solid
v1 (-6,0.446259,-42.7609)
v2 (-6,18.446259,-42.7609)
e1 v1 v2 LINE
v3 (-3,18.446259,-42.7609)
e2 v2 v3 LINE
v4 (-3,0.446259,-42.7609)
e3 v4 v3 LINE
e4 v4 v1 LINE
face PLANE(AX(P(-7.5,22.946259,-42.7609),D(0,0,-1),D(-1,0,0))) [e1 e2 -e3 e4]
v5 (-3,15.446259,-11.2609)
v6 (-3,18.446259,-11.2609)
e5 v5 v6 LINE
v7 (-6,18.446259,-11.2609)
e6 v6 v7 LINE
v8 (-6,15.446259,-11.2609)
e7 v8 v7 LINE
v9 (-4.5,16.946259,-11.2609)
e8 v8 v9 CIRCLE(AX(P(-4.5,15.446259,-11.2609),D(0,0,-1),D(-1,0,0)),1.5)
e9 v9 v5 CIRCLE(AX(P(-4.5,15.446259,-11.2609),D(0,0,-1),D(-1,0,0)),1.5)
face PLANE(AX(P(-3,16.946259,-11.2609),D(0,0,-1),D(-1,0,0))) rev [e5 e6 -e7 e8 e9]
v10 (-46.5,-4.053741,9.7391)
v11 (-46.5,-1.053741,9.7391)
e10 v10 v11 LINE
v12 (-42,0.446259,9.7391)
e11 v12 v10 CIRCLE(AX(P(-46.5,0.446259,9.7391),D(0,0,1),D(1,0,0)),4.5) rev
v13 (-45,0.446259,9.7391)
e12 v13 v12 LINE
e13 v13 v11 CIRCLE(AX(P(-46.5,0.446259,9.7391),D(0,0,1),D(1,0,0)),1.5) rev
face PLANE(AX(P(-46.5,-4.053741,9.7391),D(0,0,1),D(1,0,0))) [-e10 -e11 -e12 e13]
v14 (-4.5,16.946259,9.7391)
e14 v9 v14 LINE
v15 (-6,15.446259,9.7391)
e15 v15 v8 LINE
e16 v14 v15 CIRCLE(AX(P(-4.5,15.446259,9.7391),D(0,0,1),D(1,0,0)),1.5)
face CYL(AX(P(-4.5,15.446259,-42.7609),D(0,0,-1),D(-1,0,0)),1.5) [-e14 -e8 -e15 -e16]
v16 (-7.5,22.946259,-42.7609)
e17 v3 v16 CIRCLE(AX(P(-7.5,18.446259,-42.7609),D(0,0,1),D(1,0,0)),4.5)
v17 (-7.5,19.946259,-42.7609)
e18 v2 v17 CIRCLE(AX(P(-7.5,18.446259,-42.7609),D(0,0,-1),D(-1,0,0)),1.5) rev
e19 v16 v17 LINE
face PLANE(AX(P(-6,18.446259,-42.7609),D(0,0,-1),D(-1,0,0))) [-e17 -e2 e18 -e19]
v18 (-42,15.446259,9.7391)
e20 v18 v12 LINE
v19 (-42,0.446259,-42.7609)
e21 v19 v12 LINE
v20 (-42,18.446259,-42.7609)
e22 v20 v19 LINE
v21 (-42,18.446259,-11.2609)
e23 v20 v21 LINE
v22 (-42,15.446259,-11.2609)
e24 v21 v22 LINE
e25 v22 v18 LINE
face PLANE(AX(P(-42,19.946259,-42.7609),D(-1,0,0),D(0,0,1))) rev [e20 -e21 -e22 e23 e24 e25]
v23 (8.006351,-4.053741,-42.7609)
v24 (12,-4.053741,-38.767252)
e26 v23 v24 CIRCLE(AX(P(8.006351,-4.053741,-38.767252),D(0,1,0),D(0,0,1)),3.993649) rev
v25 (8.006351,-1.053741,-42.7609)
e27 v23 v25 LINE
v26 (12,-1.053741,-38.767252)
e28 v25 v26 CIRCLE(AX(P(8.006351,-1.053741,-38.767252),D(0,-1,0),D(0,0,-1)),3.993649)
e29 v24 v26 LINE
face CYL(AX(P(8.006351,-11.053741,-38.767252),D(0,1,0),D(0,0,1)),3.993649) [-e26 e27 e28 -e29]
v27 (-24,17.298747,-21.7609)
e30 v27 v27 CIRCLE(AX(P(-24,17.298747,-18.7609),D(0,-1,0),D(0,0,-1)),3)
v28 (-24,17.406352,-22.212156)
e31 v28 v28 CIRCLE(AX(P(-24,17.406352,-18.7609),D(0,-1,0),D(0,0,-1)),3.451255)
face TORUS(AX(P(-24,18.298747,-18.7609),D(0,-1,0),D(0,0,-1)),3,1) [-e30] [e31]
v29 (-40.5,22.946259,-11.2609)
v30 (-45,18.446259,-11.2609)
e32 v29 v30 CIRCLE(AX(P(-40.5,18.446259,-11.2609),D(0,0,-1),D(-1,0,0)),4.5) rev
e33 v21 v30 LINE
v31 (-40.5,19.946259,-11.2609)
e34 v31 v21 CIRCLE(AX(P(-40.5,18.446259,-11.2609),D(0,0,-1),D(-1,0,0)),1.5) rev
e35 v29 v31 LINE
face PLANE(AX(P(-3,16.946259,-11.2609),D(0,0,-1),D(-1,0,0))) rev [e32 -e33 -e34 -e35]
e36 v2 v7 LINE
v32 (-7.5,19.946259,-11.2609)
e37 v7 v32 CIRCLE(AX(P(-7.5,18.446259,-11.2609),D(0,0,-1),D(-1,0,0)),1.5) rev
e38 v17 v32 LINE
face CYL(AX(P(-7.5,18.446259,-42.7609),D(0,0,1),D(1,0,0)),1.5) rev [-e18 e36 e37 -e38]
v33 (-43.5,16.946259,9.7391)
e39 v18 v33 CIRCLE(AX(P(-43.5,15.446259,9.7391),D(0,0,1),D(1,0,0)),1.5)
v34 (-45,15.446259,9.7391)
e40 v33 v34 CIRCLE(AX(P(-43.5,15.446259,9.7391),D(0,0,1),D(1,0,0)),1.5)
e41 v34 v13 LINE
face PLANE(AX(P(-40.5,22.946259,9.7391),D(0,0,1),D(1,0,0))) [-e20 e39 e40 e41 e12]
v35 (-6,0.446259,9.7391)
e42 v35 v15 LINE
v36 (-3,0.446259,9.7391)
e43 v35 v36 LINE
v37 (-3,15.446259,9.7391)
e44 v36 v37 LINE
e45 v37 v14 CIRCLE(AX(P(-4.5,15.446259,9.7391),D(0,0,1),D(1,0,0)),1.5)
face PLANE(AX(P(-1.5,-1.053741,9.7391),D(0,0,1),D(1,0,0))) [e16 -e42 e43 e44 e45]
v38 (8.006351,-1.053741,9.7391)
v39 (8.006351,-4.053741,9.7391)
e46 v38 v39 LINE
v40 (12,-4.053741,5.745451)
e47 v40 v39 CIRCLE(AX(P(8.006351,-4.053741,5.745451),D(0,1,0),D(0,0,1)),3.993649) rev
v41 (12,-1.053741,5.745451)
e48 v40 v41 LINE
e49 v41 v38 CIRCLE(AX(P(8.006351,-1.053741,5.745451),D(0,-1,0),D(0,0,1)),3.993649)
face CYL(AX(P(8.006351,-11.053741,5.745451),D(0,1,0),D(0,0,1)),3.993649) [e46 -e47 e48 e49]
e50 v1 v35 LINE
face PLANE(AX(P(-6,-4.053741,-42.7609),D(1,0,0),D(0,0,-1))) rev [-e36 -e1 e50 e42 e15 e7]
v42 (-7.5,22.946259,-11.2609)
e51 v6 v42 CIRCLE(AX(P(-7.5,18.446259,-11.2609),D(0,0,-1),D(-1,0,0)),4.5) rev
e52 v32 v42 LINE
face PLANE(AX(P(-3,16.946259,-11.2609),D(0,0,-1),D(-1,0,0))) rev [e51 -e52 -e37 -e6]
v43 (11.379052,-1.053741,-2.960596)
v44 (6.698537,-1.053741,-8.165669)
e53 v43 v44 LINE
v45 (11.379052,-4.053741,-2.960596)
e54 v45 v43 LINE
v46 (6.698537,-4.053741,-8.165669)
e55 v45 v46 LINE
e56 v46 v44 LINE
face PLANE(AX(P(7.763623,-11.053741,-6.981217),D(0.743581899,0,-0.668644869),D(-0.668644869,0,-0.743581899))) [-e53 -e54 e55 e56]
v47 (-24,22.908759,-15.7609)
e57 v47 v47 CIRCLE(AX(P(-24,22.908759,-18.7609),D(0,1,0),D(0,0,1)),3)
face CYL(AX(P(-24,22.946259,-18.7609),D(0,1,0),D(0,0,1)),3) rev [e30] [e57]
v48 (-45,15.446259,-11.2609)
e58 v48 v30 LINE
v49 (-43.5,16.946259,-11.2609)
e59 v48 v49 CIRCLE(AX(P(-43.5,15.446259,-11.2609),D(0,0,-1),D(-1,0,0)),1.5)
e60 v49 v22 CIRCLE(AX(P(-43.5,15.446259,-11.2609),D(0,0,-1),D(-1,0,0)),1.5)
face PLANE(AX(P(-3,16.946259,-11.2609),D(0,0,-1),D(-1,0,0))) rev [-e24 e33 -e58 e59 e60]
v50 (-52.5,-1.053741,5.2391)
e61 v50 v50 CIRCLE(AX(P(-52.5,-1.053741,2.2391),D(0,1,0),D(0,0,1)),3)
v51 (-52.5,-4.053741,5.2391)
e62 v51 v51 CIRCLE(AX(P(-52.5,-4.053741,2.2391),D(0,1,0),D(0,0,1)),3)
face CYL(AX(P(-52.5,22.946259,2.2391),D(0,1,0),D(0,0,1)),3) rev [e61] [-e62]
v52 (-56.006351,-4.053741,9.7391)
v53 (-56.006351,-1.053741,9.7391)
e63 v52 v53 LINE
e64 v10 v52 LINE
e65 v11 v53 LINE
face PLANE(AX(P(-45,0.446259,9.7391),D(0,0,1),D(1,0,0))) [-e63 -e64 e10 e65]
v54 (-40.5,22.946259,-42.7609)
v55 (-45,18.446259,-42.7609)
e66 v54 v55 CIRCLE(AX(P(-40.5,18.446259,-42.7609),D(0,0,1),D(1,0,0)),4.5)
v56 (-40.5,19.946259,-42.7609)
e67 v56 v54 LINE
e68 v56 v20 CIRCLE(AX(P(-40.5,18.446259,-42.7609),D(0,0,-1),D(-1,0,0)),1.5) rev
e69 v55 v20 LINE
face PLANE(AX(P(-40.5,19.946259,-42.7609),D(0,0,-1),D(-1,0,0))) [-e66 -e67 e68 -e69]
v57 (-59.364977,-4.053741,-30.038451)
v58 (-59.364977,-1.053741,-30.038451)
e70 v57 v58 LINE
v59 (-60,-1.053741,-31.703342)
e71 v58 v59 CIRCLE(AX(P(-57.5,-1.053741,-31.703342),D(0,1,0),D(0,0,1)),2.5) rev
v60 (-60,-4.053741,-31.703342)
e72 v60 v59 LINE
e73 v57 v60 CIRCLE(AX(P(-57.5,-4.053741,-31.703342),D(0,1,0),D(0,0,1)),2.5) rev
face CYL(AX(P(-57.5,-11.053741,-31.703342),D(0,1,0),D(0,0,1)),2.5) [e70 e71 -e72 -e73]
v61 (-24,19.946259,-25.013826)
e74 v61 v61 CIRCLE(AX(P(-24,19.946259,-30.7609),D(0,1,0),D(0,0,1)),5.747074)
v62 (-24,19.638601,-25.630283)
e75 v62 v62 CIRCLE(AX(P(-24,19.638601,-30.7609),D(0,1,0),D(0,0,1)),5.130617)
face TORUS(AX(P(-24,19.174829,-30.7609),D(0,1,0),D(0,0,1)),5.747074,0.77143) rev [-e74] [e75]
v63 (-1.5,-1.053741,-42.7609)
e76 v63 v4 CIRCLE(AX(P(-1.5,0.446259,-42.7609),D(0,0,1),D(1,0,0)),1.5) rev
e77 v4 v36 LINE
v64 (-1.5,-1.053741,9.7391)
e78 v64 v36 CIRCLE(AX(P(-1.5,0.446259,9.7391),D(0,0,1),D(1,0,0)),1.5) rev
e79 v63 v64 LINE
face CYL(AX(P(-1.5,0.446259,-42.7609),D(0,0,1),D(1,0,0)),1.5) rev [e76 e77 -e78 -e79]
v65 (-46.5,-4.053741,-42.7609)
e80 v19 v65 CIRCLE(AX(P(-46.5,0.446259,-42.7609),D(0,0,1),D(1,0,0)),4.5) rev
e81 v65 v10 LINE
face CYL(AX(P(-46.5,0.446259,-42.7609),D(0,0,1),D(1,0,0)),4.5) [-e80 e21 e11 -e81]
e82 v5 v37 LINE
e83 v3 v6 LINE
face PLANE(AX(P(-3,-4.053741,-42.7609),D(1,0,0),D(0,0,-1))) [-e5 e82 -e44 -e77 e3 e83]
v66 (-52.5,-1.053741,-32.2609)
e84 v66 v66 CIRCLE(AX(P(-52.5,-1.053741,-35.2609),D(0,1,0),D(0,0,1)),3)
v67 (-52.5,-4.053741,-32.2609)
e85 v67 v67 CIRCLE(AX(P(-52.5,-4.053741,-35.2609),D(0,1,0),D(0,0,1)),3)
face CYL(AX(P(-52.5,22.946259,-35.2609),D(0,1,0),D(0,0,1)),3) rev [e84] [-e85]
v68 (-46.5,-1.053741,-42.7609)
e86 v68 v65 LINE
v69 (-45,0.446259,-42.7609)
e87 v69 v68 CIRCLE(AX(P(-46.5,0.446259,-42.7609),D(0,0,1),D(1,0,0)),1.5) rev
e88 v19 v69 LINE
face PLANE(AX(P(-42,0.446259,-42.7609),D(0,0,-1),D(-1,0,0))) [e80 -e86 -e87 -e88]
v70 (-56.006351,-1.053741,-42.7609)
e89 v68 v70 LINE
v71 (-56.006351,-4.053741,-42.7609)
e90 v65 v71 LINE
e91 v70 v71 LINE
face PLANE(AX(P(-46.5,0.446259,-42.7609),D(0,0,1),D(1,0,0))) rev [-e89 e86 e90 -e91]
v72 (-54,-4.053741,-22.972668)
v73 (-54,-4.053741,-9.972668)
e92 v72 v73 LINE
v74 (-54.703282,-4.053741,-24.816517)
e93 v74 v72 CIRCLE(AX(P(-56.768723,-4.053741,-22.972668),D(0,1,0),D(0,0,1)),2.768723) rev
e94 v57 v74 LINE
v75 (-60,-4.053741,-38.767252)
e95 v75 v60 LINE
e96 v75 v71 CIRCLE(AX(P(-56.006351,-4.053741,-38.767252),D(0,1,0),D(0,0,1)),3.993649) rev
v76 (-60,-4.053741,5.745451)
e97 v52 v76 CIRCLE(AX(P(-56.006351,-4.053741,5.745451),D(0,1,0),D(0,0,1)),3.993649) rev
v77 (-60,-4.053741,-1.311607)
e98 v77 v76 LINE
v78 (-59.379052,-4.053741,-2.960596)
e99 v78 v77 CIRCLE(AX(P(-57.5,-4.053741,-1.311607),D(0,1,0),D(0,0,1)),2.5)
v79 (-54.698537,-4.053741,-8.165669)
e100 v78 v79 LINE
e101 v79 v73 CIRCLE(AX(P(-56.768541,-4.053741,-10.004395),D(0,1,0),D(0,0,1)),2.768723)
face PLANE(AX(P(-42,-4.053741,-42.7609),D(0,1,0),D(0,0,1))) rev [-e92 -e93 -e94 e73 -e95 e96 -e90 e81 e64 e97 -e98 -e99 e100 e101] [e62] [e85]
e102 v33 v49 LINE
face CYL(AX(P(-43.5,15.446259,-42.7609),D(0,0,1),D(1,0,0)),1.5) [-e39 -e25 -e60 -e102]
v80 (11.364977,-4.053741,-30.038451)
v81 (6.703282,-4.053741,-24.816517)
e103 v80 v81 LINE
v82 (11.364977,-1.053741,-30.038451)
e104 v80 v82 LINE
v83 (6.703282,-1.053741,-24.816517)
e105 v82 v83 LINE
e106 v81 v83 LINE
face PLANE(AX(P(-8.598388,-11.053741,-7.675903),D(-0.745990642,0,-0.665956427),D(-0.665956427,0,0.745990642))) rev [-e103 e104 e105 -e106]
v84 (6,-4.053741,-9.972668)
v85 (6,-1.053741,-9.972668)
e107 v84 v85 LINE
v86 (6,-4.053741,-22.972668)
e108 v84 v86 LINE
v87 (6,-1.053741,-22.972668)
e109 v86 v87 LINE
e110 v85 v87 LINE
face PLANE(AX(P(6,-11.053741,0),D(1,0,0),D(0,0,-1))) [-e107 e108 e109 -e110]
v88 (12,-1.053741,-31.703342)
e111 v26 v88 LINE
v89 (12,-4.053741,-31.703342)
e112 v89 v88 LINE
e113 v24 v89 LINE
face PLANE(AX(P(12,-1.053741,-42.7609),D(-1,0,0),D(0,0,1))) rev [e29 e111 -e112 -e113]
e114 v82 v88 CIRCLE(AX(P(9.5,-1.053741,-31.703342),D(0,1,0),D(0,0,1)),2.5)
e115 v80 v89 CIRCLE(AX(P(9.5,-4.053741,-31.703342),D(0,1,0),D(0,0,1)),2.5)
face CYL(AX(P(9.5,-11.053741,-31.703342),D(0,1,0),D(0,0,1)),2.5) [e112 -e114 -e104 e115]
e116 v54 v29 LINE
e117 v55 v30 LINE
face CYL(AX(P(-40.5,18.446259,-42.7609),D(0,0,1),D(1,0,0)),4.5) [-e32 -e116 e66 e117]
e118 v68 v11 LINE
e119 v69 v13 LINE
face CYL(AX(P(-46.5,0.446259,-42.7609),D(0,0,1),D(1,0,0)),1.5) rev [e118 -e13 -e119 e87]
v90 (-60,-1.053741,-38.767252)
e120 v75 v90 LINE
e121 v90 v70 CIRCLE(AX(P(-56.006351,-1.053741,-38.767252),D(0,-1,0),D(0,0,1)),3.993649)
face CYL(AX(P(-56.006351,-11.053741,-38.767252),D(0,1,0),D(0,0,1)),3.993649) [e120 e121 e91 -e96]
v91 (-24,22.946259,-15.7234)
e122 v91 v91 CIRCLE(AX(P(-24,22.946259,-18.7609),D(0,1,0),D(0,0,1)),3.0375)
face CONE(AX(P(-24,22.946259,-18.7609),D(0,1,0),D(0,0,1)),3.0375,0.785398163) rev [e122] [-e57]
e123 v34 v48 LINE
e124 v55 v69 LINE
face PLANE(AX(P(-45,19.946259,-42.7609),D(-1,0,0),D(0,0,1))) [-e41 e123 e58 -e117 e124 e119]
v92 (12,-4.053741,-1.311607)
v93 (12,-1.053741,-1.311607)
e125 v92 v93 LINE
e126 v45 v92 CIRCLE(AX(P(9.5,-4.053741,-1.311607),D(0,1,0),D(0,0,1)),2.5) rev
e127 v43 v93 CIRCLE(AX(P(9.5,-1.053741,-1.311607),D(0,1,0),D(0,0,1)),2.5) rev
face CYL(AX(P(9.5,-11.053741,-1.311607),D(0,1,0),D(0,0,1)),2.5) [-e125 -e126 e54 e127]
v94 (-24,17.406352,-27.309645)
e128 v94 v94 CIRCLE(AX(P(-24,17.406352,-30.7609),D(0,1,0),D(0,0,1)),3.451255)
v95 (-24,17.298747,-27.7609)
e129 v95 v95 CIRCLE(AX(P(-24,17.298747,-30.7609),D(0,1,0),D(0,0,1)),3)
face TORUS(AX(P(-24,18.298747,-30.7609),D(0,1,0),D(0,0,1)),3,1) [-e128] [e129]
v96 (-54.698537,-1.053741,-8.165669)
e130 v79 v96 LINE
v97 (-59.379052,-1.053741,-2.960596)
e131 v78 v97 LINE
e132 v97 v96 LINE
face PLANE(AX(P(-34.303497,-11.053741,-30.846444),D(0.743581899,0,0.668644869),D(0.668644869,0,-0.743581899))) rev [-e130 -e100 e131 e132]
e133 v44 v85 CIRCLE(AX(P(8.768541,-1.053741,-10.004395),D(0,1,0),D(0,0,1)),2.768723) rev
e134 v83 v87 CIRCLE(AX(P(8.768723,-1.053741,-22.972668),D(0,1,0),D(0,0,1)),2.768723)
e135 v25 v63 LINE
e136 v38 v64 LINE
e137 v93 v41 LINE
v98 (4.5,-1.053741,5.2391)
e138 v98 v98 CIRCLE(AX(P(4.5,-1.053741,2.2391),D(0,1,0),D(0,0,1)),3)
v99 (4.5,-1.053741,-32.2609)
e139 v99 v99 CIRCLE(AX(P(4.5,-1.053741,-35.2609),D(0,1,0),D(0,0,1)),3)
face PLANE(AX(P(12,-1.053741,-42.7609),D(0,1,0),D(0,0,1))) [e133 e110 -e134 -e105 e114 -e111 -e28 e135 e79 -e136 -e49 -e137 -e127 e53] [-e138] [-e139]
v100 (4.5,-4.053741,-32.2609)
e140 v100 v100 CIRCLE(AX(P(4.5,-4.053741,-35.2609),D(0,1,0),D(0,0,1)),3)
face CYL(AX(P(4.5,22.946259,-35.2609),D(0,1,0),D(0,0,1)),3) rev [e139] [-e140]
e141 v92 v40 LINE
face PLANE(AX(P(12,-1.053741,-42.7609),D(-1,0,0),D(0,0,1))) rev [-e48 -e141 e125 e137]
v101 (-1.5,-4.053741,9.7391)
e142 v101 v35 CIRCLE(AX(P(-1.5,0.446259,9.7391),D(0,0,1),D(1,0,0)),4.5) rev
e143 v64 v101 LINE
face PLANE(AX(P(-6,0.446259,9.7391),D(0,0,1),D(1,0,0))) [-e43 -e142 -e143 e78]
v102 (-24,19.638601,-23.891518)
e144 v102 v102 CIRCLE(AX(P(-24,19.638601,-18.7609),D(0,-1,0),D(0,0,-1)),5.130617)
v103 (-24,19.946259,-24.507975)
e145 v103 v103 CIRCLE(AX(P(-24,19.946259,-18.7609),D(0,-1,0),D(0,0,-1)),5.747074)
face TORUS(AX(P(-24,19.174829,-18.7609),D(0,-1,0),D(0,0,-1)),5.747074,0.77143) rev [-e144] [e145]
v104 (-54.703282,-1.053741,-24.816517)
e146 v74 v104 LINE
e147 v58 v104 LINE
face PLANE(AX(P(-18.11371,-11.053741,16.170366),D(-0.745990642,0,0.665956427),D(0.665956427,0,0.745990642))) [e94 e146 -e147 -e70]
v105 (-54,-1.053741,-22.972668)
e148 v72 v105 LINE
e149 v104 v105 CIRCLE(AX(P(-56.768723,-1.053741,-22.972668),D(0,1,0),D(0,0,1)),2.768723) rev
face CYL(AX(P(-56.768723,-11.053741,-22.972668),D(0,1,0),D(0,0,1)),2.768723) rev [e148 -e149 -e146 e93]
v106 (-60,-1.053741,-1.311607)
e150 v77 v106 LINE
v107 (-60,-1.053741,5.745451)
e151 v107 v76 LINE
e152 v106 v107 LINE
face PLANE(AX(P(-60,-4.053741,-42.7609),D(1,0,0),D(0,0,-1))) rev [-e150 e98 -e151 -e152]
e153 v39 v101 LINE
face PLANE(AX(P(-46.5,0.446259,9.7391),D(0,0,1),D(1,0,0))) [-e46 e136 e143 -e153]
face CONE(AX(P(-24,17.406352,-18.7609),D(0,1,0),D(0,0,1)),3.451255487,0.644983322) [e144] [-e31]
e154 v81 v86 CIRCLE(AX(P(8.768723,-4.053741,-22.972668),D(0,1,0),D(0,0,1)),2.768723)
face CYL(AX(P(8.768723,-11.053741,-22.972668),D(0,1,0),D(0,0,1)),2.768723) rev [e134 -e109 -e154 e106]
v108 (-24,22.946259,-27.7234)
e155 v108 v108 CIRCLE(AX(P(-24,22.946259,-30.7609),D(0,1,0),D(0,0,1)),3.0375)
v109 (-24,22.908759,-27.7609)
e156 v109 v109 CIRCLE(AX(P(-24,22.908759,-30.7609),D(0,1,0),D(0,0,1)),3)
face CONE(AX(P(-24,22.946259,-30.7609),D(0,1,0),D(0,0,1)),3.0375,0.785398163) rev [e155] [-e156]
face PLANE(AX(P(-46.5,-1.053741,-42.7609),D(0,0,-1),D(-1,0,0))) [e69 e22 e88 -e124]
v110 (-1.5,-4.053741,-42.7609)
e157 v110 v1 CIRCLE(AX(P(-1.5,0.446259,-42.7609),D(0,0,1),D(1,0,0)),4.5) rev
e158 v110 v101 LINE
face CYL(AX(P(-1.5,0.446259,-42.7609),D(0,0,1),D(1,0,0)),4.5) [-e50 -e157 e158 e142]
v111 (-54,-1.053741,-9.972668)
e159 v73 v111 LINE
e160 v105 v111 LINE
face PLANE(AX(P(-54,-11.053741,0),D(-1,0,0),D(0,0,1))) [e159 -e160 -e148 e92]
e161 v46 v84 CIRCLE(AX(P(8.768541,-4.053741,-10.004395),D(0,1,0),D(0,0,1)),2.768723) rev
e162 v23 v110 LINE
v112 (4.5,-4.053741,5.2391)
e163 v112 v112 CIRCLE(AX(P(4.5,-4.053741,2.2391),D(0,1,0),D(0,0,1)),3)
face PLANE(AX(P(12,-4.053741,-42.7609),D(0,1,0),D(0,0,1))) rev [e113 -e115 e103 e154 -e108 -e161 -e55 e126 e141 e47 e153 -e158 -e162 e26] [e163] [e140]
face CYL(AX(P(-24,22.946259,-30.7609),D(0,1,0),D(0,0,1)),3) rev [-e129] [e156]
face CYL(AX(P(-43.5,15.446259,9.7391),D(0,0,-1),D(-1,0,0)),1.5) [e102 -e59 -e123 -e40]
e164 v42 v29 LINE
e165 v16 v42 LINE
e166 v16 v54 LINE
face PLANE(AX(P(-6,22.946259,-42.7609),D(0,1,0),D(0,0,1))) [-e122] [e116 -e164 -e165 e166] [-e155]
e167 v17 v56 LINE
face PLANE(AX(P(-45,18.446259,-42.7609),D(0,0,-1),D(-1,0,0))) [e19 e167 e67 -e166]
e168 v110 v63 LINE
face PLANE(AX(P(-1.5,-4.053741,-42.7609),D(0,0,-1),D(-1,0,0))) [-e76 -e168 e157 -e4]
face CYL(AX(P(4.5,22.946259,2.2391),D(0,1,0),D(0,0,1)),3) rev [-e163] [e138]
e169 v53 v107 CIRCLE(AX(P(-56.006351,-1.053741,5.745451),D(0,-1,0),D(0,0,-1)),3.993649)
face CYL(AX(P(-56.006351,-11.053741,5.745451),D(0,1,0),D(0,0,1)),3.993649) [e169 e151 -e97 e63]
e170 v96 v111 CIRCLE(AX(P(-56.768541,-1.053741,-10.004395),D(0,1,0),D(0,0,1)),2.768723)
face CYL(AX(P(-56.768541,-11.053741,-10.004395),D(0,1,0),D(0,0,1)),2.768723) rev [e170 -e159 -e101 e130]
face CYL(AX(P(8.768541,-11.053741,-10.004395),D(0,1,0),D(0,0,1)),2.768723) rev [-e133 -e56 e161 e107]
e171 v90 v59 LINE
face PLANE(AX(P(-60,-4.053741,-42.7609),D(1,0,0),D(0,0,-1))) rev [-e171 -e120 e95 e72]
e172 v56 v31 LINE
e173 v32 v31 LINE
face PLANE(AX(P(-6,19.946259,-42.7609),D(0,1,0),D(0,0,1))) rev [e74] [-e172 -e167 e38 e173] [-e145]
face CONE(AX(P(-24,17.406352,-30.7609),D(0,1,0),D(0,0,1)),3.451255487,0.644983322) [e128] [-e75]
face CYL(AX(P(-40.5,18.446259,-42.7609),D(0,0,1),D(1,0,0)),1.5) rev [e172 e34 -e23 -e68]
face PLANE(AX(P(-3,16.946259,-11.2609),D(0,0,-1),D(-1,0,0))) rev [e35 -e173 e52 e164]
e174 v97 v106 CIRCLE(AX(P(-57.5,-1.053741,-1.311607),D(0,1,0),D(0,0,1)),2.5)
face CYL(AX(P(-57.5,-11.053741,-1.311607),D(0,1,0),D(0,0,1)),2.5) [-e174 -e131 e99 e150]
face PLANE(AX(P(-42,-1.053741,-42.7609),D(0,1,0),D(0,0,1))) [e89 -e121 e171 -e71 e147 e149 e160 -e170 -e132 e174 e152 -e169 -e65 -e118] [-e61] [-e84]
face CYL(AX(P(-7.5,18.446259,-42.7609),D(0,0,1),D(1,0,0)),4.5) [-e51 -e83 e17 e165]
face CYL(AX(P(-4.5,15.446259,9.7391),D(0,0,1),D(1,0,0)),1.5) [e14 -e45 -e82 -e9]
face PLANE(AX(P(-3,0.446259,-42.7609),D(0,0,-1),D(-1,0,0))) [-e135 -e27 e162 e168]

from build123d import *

# Parameters (mm, degrees)
BASE_FLANGE1_DEPTH                 = 35
SKETCH10_W                         = 28
SKETCH10_H                         = 14
CUT_EXTRUDE1_DEPTH                 = 4
F_4_0_4_DIAMETER_HOLE1_D           = 4
F_4_0_4_DIAMETER_HOLE1_CSINK_D     = 4.05
F_4_0_4_DIAMETER_HOLE1_CSINK_ANGLE = 90
SCALE1_SCALE                       = 1.5
CUT_EXTRUDE2_DEPTH                 = 10
CUT_EXTRUDE3_DEPTH                 = 10
FILLET1_R                          = 1.5


# Sheet-metal steps are written as plain solids
with BuildPart() as part:
    # Sketch1 → Base-Flange1 (new body)
    with BuildSketch(Plane.XY):
        with BuildLine():
            Line((0, 0), (-9, 0))
            ThreePointArc((-9, 0), (-11.121320344, 0.878679656), (-12, 3))
            Line((-12, 3), (-12, 15))
            ThreePointArc((-12, 15), (-12.292893219, 15.707106781), (-13, 16))
            Line((-13, 16), (-35, 16))
            ThreePointArc((-35, 16), (-35.707106781, 15.707106781), (-36, 15))
            Line((-36, 15), (-36, 3))
            ThreePointArc((-36, 3), (-36.878679656, 0.878679656), (-39, 0))
            Line((-39, 0), (-48, 0))
            Line((-48, 0), (-48, 2))
            Line((-48, 2), (-39, 2))
            ThreePointArc((-39, 2), (-38.292893219, 2.292893219), (-38, 3))
            Line((-38, 3), (-38, 15))
            ThreePointArc((-38, 15), (-37.121320344, 17.121320344), (-35, 18))
            Line((-35, 18), (-13, 18))
            ThreePointArc((-13, 18), (-10.878679656, 17.121320344), (-10, 15))
            Line((-10, 15), (-10, 3))
            ThreePointArc((-10, 3), (-9.707106781, 2.292893219), (-9, 2))
            Line((-9, 2), (0, 2))
            Line((0, 2), (0, 0))
        make_face()
    extrude(amount=-BASE_FLANGE1_DEPTH)

    # Sketch10 → Cut-Extrude1 (cut)
    with BuildSketch(Plane(origin=(0, 18, 0), x_dir=(1, 0, 0), z_dir=(0, 1, 0))):
        with Locations((-24, 7)):
            Rectangle(SKETCH10_W, SKETCH10_H)
    extrude(amount=-CUT_EXTRUDE1_DEPTH, mode=Mode.SUBTRACT)

    # Ø4.0 (4) Diameter Hole1 (through all)
    with Locations(Plane(origin=(0, 18, 0), x_dir=(1, 0, 0), z_dir=(0, 1, 0))):
        with Locations((-24, 27), (-24, 19), (-43, 30), (-43, 5), (-5, 30), (-5, 5)):
            CounterSinkHole(F_4_0_4_DIAMETER_HOLE1_D / 2, F_4_0_4_DIAMETER_HOLE1_CSINK_D / 2, counter_sink_angle=F_4_0_4_DIAMETER_HOLE1_CSINK_ANGLE)


with BuildPart() as part_1:
    # Scale1: scaled about (-24, 8.107482912, -19.478199083)
    add(part.part.scale(SCALE1_SCALE).moved(Location((12, -4.053741456, 9.739099541))))

    # Sketch15 → Cut-Extrude2 (cut)
    with BuildSketch(Plane(origin=(0, -1.053741456, 0), x_dir=(1, 0, 0), z_dir=(0, 1, 0))):
        with BuildLine():
            Line((-60, 38.767251784), (-60, 42.760900459))
            Line((-60, 42.760900459), (-56.006351326, 42.760900459))
            ThreePointArc((-56.006351326, 42.760900459), (-58.830287385, 41.591187844), (-60, 38.767251784))
        make_face()
        with BuildLine():
            Line((-60, -9.739099541), (-56.006351326, -9.739099541))
            ThreePointArc((-56.006351326, -9.739099541), (-58.830287385, -8.569386926), (-60, -5.745450867))
            Line((-60, -5.745450867), (-60, -9.739099541))
        make_face()
        with BuildLine():
            Line((12, -5.745450867), (12, -9.739099541))
            Line((12, -9.739099541), (8.006351326, -9.739099541))
            ThreePointArc((8.006351326, -9.739099541), (10.830287385, -8.569386926), (12, -5.745450867))
        make_face()
        with BuildLine():
            Line((12, 42.760900459), (8.006351326, 42.760900459))
            ThreePointArc((8.006351326, 42.760900459), (10.830287385, 41.591187844), (12, 38.767251784))
            Line((12, 38.767251784), (12, 42.760900459))
        make_face()
    extrude(amount=-CUT_EXTRUDE2_DEPTH, mode=Mode.SUBTRACT)

    # Sketch16 → Cut-Extrude3 (cut)
    with BuildSketch(Plane(origin=(0, -1.053741456, 0), x_dir=(1, 0, 0), z_dir=(0, 1, 0))):
        with BuildLine():
            Line((-54.703281617, 24.816516721), (-59.364976604, 30.038451214))
            ThreePointArc((-59.364976604, 30.038451214), (-59.835855465, 30.812399385), (-60, 31.703342281))
            Line((-60, 31.703342281), (-60, 1.311607043))
            ThreePointArc((-60, 1.311607043), (-59.839618442, 2.192620974), (-59.379051563, 2.960596195))
            Line((-59.379051563, 2.960596195), (-54.698537483, 8.165669485))
            ThreePointArc((-54.698537483, 8.165669485), (-54.186063754, 9.006077869), (-54, 9.972667676))
            Line((-54, 9.972667676), (-54, 22.972667676))
            ThreePointArc((-54, 22.972667676), (-54.181788316, 23.959377402), (-54.703281617, 24.816516721))
        make_face()
        with BuildLine():
            Line((11.364976604, 30.038451214), (6.703281617, 24.816516721))
            ThreePointArc((6.703281617, 24.816516721), (6.181788316, 23.959377402), (6, 22.972667676))
            Line((6, 22.972667676), (6, 9.972667676))
            ThreePointArc((6, 9.972667676), (6.186063754, 9.006077869), (6.698537483, 8.165669485))
            Line((6.698537483, 8.165669485), (11.379051563, 2.960596195))
            ThreePointArc((11.379051563, 2.960596195), (11.839618442, 2.192620974), (12, 1.311607043))
            Line((12, 1.311607043), (12, 31.703342281))
            ThreePointArc((12, 31.703342281), (11.835855465, 30.812399385), (11.364976604, 30.038451214))
        make_face()
    extrude(amount=-CUT_EXTRUDE3_DEPTH, mode=Mode.SUBTRACT)

    # Fillet1
    fillet1_edges = [part_1.edges().sort_by_distance(p)[0] for p in [
        (-3, 16.946258544, -0.760900459),
        (-45, 16.946258544, -0.760900458),
        (-6, 16.946258544, -0.760900459),
        (-42, 16.946258544, -0.760900459),
    ]]
    fillet(fillet1_edges, radius=FILLET1_R - 0.0001)  # a hair under: the kernel refuses the full size

    # Sketch18 → Revolve1 (revolve)
    with BuildSketch(Plane(origin=(0, 0, -30.760900459), x_dir=(-1, 0, 0), z_dir=(0, 0, -1)), mode=Mode.PRIVATE) as revolve1_sk:
        with BuildLine():
            Line((27, 19.946258544), (27, 17.298747157))
            ThreePointArc((27, 17.298747157), (27.231953871, 17.32602037), (27.451255487, 17.406352354))
            Line((27.451255487, 17.406352354), (29.130617451, 19.638600901))
            ThreePointArc((29.130617451, 19.638600901), (29.402592072, 19.865072033), (29.747074465, 19.946258544))
            Line((29.747074465, 19.946258544), (27, 19.946258544))
        make_face()
    revolve(revolve1_sk.sketch.rotate(Axis((-24, 22.908758544, -30.760900459), (0, -1, 0)), 270), axis=Axis((-24, 22.908758544, -30.760900459), (0, -1, 0)))

    # Sketch20 → Revolve2 (revolve)
    with BuildSketch(Plane(origin=(0, 0, -18.760900459), x_dir=(-1, 0, 0), z_dir=(0, 0, -1)), mode=Mode.PRIVATE) as revolve2_sk:
        with BuildLine():
            Line((29.747074465, 19.946258544), (27, 19.946258544))
            Line((27, 19.946258544), (27, 17.298747157))
            ThreePointArc((27, 17.298747157), (27.231953871, 17.32602037), (27.451255487, 17.406352354))
            Line((27.451255487, 17.406352354), (29.130617451, 19.638600901))
            ThreePointArc((29.130617451, 19.638600901), (29.402592072, 19.865072033), (29.747074465, 19.946258544))
        make_face()
    revolve(revolve2_sk.sketch.rotate(Axis((-24, 19.946258544, -18.760900459), (0, 1, 0)), 270), axis=Axis((-24, 19.946258544, -18.760900459), (0, 1, 0)))


solid = part_1.part
